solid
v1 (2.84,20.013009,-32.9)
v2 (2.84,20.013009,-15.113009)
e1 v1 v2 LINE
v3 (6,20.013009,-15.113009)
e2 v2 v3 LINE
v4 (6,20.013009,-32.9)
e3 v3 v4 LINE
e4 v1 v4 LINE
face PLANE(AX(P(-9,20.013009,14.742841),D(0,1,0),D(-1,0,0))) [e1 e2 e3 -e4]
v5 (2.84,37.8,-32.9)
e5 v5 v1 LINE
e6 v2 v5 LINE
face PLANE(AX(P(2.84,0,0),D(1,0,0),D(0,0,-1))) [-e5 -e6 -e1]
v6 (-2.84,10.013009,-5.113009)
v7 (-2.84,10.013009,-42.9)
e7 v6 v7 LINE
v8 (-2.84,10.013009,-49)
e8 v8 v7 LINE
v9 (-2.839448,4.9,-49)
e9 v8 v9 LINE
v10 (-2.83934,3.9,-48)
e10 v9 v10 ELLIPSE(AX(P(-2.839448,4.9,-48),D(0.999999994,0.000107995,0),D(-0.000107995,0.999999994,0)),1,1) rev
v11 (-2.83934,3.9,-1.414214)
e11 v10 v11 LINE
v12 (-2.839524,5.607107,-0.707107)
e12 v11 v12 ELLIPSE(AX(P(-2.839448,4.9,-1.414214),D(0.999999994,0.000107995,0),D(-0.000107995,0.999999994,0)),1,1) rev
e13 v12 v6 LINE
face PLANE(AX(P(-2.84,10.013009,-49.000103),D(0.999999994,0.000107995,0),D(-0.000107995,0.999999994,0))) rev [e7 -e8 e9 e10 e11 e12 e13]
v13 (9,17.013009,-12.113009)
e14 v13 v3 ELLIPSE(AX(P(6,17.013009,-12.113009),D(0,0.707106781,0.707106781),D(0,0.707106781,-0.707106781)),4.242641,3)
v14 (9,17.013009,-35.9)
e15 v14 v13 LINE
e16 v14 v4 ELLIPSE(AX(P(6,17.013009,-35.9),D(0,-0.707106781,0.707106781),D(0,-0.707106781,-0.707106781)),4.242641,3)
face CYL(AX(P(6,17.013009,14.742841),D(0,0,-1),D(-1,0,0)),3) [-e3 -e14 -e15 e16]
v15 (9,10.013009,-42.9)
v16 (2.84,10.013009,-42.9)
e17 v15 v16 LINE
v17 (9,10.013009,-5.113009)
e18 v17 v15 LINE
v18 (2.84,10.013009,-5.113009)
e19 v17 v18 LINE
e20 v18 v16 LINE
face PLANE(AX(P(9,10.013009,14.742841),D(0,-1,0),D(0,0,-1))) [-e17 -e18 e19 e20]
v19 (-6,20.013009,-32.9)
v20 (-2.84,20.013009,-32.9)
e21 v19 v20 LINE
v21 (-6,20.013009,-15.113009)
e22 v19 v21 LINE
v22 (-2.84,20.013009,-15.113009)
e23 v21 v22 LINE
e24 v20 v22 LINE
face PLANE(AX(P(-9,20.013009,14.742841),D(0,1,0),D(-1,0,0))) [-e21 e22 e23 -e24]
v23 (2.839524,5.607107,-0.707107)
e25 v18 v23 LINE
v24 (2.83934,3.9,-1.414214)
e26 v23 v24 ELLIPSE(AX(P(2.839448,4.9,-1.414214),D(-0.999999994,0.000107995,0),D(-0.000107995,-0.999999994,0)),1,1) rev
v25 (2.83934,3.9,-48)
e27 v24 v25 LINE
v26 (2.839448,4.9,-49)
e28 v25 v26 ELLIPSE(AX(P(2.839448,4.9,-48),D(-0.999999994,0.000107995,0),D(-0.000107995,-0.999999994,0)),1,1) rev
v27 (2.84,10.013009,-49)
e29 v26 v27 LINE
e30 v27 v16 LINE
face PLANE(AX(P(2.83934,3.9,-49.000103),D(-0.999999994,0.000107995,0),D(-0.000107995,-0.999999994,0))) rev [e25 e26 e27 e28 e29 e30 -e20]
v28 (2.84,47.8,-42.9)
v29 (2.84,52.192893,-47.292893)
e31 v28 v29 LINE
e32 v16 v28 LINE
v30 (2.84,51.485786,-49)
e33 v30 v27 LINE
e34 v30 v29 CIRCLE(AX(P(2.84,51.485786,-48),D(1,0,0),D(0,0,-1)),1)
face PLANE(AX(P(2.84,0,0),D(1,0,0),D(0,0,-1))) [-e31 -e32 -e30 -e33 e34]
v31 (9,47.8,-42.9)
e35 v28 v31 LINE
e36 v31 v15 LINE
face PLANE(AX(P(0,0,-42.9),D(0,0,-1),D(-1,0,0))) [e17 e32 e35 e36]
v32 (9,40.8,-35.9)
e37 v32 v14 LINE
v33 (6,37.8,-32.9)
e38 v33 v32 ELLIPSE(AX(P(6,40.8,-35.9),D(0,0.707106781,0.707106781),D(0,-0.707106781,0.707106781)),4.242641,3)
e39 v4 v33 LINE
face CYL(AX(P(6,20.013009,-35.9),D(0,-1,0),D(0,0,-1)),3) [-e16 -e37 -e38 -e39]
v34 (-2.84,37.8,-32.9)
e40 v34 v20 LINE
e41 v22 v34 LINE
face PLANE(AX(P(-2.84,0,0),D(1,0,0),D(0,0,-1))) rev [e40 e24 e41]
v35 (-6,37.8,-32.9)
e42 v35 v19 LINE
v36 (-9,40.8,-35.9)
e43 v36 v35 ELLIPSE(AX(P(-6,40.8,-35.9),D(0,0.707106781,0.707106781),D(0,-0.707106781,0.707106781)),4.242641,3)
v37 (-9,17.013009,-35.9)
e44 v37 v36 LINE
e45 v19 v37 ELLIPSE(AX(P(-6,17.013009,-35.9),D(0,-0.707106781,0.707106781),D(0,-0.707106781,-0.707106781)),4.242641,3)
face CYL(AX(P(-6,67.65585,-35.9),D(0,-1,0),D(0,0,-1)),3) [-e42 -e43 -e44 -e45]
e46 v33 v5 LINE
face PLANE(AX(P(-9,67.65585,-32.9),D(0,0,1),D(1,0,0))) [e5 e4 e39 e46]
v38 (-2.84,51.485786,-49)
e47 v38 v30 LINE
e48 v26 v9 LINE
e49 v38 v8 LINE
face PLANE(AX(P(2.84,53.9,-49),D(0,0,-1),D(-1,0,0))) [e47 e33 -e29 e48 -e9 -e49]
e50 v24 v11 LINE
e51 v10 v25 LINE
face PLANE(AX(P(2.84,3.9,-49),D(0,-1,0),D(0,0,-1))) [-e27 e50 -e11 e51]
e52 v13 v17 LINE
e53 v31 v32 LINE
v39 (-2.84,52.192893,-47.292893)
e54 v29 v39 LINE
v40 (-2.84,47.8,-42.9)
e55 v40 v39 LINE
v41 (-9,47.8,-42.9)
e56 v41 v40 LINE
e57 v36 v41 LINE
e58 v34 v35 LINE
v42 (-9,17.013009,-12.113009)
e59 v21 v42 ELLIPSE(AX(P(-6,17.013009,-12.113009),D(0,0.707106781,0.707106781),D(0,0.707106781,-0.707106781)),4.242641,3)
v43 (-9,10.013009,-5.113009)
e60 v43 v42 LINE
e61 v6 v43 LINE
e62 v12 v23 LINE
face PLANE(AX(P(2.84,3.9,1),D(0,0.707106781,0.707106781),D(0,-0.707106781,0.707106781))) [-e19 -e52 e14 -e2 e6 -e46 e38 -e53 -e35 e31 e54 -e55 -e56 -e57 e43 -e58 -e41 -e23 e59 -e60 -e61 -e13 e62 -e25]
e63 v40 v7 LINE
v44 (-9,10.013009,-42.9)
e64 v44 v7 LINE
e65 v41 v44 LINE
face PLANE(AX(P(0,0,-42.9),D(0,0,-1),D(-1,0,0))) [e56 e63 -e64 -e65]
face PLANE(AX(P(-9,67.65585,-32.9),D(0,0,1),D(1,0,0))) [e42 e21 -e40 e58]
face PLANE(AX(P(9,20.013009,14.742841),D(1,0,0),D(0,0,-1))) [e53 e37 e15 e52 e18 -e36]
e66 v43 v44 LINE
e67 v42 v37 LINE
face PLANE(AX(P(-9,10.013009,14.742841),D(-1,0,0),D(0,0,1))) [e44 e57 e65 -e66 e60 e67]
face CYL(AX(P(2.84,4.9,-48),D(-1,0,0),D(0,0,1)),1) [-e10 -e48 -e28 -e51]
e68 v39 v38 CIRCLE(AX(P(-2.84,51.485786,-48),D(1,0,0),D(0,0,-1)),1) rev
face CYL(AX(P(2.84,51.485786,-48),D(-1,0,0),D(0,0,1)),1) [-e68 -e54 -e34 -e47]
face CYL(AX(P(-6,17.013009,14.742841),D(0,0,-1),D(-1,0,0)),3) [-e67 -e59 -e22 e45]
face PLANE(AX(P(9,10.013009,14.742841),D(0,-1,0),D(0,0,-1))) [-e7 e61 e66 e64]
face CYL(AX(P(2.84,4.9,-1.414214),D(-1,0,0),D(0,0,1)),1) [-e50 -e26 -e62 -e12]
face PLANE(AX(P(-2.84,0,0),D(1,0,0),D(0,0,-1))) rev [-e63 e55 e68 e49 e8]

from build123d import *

# Parameters (mm, degrees)
SKETCH1_R           = 2.1
BOSS_EXTRUDE1_DEPTH = 1
FILLET1_R           = 1
BOSS_EXTRUDE2_DEPTH = 2.84
BOSS_EXTRUDE3_REACH = 76.197
SKETCH9_W           = 18
SKETCH9_H           = 10
SKETCH10_W          = 6.16
SKETCH10_H          = 10
SKETCH10_H_2        = 10.013009375
CUT_EXTRUDE1_DEPTH  = 6.1
BOSS_EXTRUDE4_START = -9
BOSS_EXTRUDE4_DEPTH = 18
CUT_EXTRUDE3_DEPTH  = 75.197102369
FILLET3_R           = 3
FILLET4_R           = 3
FILLET5_R           = 3
FILLET6_R           = 1
FILLET7_R           = 1


# Read off the part's stored shape, not the designer's step: Boss-Extrude4
with BuildPart() as part:
    # Sketch1 → Boss-Extrude1 (new body)
    with BuildSketch(Plane.XY):
        with BuildLine():
            Line((-2.839339828, 3.9), (-5.470710678, 6.53137085))
            ThreePointArc((-5.470710678, 6.53137085), (-5.492387953, 6.563813185), (-5.5, 6.602081528))
            Line((-5.5, 6.602081528), (-5.5, 8.1))
            ThreePointArc((-5.5, 8.1), (-5.470710678, 8.170710678), (-5.4, 8.2))
            Line((-5.4, 8.2), (-3.334418044, 8.2))
            ThreePointArc((-3.334418044, 8.2), (-3.244178397, 8.256909326), (-3.2566483, 8.362863876))
            Line((-3.2566483, 8.362863876), (-4.58, 10))
            Line((-4.58, 10), (-10, 10))
            Line((-10, 10), (-10, 4.58))
            Line((-10, 4.58), (-8.362863876, 3.2566483))
            ThreePointArc((-8.362863876, 3.2566483), (-8.256909326, 3.244178397), (-8.2, 3.334418044))
            Line((-8.2, 3.334418044), (-8.2, 5.4))
            ThreePointArc((-8.2, 5.4), (-8.170710678, 5.470710678), (-8.1, 5.5))
            Line((-8.1, 5.5), (-6.602081528, 5.5))
            ThreePointArc((-6.602081528, 5.5), (-6.563813185, 5.492387953), (-6.53137085, 5.470710678))
            Line((-6.53137085, 5.470710678), (-3.9, 2.839339828))
            Line((-3.9, 2.839339828), (-3.9, -2.839339828))
            Line((-3.9, -2.839339828), (-6.53137085, -5.470710678))
            ThreePointArc((-6.53137085, -5.470710678), (-6.563813185, -5.492387953), (-6.602081528, -5.5))
            Line((-6.602081528, -5.5), (-8.1, -5.5))
            ThreePointArc((-8.1, -5.5), (-8.170710678, -5.470710678), (-8.2, -5.4))
            Line((-8.2, -5.4), (-8.2, -3.334418044))
            ThreePointArc((-8.2, -3.334418044), (-8.256909326, -3.244178397), (-8.362863876, -3.2566483))
            Line((-8.362863876, -3.2566483), (-10, -4.58))
            Line((-10, -4.58), (-10, -10))
            Line((-10, -10), (-4.58, -10))
            Line((-4.58, -10), (-3.2566483, -8.362863876))
            ThreePointArc((-3.2566483, -8.362863876), (-3.244178397, -8.256909326), (-3.334418044, -8.2))
            Line((-3.334418044, -8.2), (-5.4, -8.2))
            ThreePointArc((-5.4, -8.2), (-5.470710678, -8.170710678), (-5.5, -8.1))
            Line((-5.5, -8.1), (-5.5, -6.602081528))
            ThreePointArc((-5.5, -6.602081528), (-5.492387953, -6.563813185), (-5.470710678, -6.53137085))
            Line((-5.470710678, -6.53137085), (-2.839339828, -3.9))
            Line((-2.839339828, -3.9), (2.839339828, -3.9))
            Line((2.839339828, -3.9), (5.470710678, -6.53137085))
            ThreePointArc((5.470710678, -6.53137085), (5.492387953, -6.563813185), (5.5, -6.602081528))
            Line((5.5, -6.602081528), (5.5, -8.1))
            ThreePointArc((5.5, -8.1), (5.470710678, -8.170710678), (5.4, -8.2))
            Line((5.4, -8.2), (3.334418044, -8.2))
            ThreePointArc((3.334418044, -8.2), (3.244178397, -8.256909326), (3.2566483, -8.362863876))
            Line((3.2566483, -8.362863876), (4.58, -10))
            Line((4.58, -10), (10, -10))
            Line((10, -10), (10, -4.58))
            Line((10, -4.58), (8.362863876, -3.2566483))
            ThreePointArc((8.362863876, -3.2566483), (8.256909326, -3.244178397), (8.2, -3.334418044))
            Line((8.2, -3.334418044), (8.2, -5.4))
            ThreePointArc((8.2, -5.4), (8.170710678, -5.470710678), (8.1, -5.5))
            Line((8.1, -5.5), (6.602081528, -5.5))
            ThreePointArc((6.602081528, -5.5), (6.563813185, -5.492387953), (6.53137085, -5.470710678))
            Line((6.53137085, -5.470710678), (3.9, -2.839339828))
            Line((3.9, -2.839339828), (3.9, 2.839339828))
            Line((3.9, 2.839339828), (6.53137085, 5.470710678))
            ThreePointArc((6.53137085, 5.470710678), (6.563813185, 5.492387953), (6.602081528, 5.5))
            Line((6.602081528, 5.5), (8.1, 5.5))
            ThreePointArc((8.1, 5.5), (8.170710678, 5.470710678), (8.2, 5.4))
            Line((8.2, 5.4), (8.2, 3.334418044))
            ThreePointArc((8.2, 3.334418044), (8.256909326, 3.244178397), (8.362863876, 3.2566483))
            Line((8.362863876, 3.2566483), (10, 4.58))
            Line((10, 4.58), (10, 10))
            Line((10, 10), (4.58, 10))
            Line((4.58, 10), (3.2566483, 8.362863876))
            ThreePointArc((3.2566483, 8.362863876), (3.244178397, 8.256909326), (3.334418044, 8.2))
            Line((3.334418044, 8.2), (5.4, 8.2))
            ThreePointArc((5.4, 8.2), (5.470710678, 8.170710678), (5.5, 8.1))
            Line((5.5, 8.1), (5.5, 6.602081528))
            ThreePointArc((5.5, 6.602081528), (5.492387953, 6.563813185), (5.470710678, 6.53137085))
            Line((5.470710678, 6.53137085), (2.839339828, 3.9))
            Line((2.839339828, 3.9), (-2.839339828, 3.9))
        make_face()
        Circle(SKETCH1_R, mode=Mode.SUBTRACT)
    extrude(amount=BOSS_EXTRUDE1_DEPTH)

    # Fillet1
    fillet1_edges = [part.edges().sort_by_distance(p)[0] for p in [
        (10, -10, 0.5),
        (-10, -10, 0.5),
        (-10, 10, 0.5),
        (10, 10, 0.5),
    ]]
    fillet(fillet1_edges, radius=FILLET1_R)


with BuildPart() as body_2:
    # 3DSketch1 → Boss-Extrude2 (new, symmetric)
    with BuildSketch(Plane(origin=(0, 3.9, 1), x_dir=(0, 0.7071067811865477, -0.7071067811865475), z_dir=(-1, 0, 0))):
        Polygon((0, 0), (70.710678119, 0), (35.355339059, 35.355339059), align=None)
    extrude(amount=BOSS_EXTRUDE2_DEPTH, both=True)

    # Boss-Extrude3: up to this plane
    boss_extrude3_end = Plane(origin=(2.84, 3.9, 1), z_dir=(0, 0.7071067811865475, 0.7071067811865476))
    # Sketch9 → Boss-Extrude3 (add, up to the surface)
    with BuildSketch(Plane(origin=(0, 0, -49), x_dir=(-1, 0, 0), z_dir=(0, 0, -1)), mode=Mode.PRIVATE) as boss_extrude3_sk1:
        with Locations((0, 15.013009375)):
            Rectangle(SKETCH9_W, SKETCH9_H)
    boss_extrude3_tool1 = split(extrude(boss_extrude3_sk1.sketch, amount=-BOSS_EXTRUDE3_REACH, mode=Mode.PRIVATE), bisect_by=boss_extrude3_end, keep=Keep.BOTH, mode=Mode.PRIVATE)
    add(boss_extrude3_tool1.solids().sort_by_distance((0, 15.013009, -49))[0])

    # Sketch10 → Cut-Extrude1 (cut)
    with BuildSketch(Plane(origin=(0, 0, -49), x_dir=(-1, 0, 0), z_dir=(0, 0, -1))):
        with Locations((-5.92, 15.013009375)):
            Rectangle(SKETCH10_W, SKETCH10_H)
        with Locations((5.92, 15.006504688)):
            Rectangle(SKETCH10_W, SKETCH10_H_2)
    extrude(amount=-CUT_EXTRUDE1_DEPTH, mode=Mode.SUBTRACT)

    # Boss-Extrude4 outline → Boss-Extrude4 (add)
    with BuildSketch(Plane.YZ.offset(BOSS_EXTRUDE4_START)):
        Polygon((20.013009375, -42.9), (47.8, -42.9), (37.8, -32.9), (20.013009375, -32.9), align=None)
    extrude(amount=BOSS_EXTRUDE4_DEPTH)


with BuildPart() as cut_extrude3_tool:
    # Sketch13 → Cut-Extrude3 (new, through all)
    with BuildSketch(Plane.XY.offset(1)):
        Polygon((-2.839339828, 3.9), (2.839339828, 3.9), (2.84, 10.013009375), (10.658445574, 10.013009375), (10.658445574, -10.0708852), (-2.84, -10.0708852), (-10.475035235, -10.0708852), (-10.475035235, 10.013009375), (-2.84, 10.013009375), align=None)
    extrude(amount=-CUT_EXTRUDE3_DEPTH)


with BuildPart() as part_1:
    add(part.part)

    # Cut-Extrude3: cut by cut_extrude3_tool
    add(cut_extrude3_tool.part, mode=Mode.SUBTRACT)


with BuildPart() as body_2_1:
    add(body_2.part)

    # Cut-Extrude3: cut by cut_extrude3_tool
    add(cut_extrude3_tool.part, mode=Mode.SUBTRACT)

    # Fillet3
    fillet3_edges = [body_2_1.edges().sort_by_distance(p)[0] for p in [
        (9, 20.013009375, -24.006504687),
    ]]
    fillet(fillet3_edges, radius=FILLET3_R)

    # Fillet4
    fillet4_edges = [body_2_1.edges().sort_by_distance(p)[0] for p in [
        (-9, 20.013009375, -24.006504687),
    ]]
    fillet(fillet4_edges, radius=FILLET4_R)

    # Fillet5
    fillet5_edges = [body_2_1.edges().sort_by_distance(p)[0] for p in [
        (9, 27.406504687, -32.9),
        (-9, 27.406504687, -32.9),
    ]]
    fillet(fillet5_edges, radius=FILLET5_R)

    # Fillet6
    fillet6_edges = [body_2_1.edges().sort_by_distance(p)[0] for p in [
        (0, 53.9, -49),
        (0, 3.9, 1),
    ]]
    fillet(fillet6_edges, radius=FILLET6_R)

    # Fillet7
    fillet7_edges = [body_2_1.edges().sort_by_distance(p)[0] for p in [
        (0, 3.9, -49),
    ]]
    fillet(fillet7_edges, radius=FILLET7_R)


solid = body_2_1.part
